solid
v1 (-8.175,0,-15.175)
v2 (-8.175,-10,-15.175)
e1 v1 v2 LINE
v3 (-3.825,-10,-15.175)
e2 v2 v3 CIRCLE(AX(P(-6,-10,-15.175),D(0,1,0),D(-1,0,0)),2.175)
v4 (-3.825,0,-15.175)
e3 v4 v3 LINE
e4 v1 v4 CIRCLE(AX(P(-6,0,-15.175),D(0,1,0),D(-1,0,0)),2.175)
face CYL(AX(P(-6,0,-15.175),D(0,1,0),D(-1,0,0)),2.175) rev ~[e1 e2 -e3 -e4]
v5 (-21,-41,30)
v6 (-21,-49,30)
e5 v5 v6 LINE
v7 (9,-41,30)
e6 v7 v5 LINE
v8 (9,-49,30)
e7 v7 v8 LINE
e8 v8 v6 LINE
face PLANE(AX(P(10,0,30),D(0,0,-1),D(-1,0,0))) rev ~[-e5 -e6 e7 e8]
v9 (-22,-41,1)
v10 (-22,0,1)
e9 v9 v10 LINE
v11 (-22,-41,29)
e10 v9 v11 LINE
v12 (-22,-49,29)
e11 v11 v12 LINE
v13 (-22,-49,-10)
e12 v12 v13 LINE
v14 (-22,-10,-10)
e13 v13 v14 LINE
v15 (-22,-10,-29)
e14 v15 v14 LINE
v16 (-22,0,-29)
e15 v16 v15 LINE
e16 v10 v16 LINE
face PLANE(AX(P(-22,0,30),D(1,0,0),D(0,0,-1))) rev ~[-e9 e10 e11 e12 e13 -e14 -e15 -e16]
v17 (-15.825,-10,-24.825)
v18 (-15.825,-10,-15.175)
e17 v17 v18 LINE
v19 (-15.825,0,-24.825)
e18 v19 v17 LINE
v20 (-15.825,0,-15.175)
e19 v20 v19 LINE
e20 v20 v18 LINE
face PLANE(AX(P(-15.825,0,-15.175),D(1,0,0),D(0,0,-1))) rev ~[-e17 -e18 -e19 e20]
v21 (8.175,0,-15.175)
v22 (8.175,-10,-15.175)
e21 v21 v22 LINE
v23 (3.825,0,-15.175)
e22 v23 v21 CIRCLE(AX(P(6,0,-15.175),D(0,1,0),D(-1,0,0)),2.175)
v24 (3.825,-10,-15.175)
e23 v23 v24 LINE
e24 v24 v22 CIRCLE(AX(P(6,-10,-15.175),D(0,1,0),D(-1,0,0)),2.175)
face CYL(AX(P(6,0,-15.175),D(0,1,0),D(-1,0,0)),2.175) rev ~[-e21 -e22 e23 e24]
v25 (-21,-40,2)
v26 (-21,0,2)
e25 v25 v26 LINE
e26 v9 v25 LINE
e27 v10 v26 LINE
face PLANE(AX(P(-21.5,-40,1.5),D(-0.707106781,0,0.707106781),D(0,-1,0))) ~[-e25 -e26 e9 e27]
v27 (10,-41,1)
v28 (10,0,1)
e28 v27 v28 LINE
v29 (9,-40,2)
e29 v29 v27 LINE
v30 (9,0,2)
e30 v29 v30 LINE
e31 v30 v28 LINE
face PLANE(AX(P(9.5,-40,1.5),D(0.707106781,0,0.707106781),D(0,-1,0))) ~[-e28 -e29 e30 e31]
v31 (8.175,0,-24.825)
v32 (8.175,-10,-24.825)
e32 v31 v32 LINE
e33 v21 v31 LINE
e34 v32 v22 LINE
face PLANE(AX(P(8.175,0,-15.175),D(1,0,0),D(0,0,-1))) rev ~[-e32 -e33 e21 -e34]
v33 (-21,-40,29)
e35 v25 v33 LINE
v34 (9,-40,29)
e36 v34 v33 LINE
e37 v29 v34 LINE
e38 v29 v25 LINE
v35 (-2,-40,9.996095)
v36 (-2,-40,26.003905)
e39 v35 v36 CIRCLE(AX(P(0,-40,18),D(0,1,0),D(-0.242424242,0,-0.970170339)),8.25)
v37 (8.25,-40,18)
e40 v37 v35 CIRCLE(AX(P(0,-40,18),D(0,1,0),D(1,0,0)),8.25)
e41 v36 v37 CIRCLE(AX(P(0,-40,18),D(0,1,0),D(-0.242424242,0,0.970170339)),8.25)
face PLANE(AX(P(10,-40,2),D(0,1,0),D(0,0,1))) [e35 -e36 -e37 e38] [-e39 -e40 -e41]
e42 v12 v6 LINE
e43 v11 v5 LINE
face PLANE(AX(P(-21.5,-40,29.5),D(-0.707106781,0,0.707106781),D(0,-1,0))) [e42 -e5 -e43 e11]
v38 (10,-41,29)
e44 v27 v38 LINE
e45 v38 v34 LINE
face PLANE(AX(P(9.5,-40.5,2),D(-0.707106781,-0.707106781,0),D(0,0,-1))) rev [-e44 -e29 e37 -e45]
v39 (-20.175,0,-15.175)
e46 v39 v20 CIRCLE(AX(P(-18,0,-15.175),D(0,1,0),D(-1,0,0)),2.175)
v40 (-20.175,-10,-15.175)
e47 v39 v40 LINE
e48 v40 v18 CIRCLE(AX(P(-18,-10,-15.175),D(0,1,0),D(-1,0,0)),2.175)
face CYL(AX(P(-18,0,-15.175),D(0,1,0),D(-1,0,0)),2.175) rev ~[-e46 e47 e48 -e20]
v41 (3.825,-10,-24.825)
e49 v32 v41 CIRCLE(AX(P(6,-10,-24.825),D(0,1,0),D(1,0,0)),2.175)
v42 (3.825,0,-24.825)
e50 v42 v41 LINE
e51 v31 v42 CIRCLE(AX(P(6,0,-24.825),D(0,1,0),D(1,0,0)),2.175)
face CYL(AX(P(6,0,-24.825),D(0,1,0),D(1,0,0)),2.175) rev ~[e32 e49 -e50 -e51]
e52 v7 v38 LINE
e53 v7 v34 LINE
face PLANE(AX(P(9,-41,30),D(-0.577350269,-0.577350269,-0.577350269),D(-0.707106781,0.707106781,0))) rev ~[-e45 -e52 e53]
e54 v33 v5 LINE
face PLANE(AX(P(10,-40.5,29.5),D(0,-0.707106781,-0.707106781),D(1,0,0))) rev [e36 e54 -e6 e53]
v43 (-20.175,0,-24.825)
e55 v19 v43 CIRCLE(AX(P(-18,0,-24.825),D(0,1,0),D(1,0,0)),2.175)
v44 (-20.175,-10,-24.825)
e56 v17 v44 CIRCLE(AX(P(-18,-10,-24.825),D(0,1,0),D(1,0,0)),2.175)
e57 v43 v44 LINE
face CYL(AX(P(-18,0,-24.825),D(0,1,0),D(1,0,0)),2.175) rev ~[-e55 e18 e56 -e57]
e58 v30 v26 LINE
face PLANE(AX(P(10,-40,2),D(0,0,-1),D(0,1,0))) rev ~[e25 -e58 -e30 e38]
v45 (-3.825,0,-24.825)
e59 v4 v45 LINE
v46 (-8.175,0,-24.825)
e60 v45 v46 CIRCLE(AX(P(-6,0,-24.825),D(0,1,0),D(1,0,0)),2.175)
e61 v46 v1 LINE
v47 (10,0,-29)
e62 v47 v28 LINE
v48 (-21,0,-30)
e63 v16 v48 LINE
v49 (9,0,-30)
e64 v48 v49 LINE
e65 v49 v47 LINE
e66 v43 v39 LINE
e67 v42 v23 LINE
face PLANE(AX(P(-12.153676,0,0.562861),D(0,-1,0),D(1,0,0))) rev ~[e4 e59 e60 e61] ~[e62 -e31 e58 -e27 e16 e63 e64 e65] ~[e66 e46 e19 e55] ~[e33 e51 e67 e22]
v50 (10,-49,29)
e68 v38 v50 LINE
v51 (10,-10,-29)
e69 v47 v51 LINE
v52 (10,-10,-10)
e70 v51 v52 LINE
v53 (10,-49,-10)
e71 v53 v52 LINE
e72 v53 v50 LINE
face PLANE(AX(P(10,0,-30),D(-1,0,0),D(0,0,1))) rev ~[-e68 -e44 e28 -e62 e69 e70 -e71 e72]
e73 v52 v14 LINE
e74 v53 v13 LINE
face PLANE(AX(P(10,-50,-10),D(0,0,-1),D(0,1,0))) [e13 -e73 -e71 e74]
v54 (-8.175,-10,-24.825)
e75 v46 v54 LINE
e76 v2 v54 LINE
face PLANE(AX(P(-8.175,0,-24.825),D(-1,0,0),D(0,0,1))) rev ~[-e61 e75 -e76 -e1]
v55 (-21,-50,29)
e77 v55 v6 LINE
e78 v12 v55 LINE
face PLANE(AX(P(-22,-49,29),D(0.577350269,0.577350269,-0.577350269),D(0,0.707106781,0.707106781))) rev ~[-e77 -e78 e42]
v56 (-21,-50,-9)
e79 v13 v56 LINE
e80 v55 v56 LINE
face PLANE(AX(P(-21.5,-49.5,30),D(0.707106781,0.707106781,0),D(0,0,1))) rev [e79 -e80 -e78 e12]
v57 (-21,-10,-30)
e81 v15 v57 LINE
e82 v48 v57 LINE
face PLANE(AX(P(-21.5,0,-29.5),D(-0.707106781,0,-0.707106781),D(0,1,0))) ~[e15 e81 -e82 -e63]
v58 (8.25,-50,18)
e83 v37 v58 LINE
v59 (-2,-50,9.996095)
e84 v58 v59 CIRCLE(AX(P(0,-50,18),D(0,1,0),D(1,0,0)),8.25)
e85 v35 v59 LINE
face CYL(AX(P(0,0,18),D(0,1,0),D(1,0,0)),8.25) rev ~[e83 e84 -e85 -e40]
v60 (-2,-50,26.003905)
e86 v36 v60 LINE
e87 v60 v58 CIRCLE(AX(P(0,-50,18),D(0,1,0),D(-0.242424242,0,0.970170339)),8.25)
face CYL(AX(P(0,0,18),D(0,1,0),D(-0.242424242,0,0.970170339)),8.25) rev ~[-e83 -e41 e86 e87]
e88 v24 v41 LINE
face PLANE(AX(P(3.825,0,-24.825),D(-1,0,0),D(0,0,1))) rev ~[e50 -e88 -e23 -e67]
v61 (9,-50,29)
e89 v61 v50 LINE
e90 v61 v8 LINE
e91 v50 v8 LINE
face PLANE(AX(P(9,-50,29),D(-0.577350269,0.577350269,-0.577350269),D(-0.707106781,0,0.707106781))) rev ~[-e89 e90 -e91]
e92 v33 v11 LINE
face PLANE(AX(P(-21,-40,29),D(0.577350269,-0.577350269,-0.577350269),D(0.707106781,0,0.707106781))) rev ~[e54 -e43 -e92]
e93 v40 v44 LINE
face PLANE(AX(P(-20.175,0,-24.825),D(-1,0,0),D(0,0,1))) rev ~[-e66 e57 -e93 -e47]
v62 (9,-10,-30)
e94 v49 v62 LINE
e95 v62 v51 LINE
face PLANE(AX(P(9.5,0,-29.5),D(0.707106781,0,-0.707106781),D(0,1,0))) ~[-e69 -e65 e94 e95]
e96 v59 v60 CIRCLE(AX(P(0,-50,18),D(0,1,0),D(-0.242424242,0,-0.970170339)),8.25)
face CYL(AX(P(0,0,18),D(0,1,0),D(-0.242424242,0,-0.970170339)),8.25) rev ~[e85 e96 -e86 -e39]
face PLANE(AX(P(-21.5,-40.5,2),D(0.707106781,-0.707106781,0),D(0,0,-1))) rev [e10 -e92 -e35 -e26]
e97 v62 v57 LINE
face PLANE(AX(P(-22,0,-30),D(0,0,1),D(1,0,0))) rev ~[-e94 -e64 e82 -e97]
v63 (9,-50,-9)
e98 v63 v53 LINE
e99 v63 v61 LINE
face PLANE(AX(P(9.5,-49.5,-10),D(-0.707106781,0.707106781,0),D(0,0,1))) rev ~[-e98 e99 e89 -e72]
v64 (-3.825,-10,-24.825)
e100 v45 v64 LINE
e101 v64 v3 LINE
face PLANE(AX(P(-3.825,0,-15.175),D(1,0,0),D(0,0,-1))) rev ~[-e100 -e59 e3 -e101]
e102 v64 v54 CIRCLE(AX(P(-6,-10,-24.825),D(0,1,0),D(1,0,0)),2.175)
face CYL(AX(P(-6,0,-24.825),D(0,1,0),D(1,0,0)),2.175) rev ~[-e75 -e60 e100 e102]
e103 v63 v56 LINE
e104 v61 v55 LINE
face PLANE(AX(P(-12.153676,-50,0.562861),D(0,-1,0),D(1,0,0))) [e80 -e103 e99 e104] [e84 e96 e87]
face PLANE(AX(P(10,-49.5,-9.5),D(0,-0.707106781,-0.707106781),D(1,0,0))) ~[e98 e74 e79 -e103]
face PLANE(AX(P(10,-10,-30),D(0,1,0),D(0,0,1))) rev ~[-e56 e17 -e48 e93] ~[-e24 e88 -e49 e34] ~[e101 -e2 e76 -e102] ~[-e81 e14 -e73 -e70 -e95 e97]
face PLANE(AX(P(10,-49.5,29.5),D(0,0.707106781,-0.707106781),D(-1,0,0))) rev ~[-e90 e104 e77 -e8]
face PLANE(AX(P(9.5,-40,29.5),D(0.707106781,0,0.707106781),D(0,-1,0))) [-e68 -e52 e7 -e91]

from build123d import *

# Parameters (mm, degrees)
F1_DEPTH = 50
F2_W     = 40
F2_H     = 28
F2_H_2   = 20
F3_DEPTH = 32.001
F4_SIZE  = 1


with BuildPart() as f1:
    # F0 (on Front) → F1 (new body)
    with BuildSketch(Plane.XZ):
        with BuildLine():
            Line((-22, 30), (-22, -30))
            Line((-22, -30), (-2, -30))
            Line((-2, -30), (-2, 9.9960947032))
            ThreePointArc((-2, 9.9960947032), (-8.25, 18), (-2, 26.0039052968))
            Line((-2, 26.0039052968), (-2, 30))
            Line((-2, 30), (-22, 30))
        make_face()
        with BuildLine():
            ThreePointArc((-15.825, -24.825), (-18, -27), (-20.175, -24.825))
            Line((-20.175, -24.825), (-20.175, -15.175))
            ThreePointArc((-20.175, -15.175), (-18, -13), (-15.825, -15.175))
            Line((-15.825, -15.175), (-15.825, -24.825))
        make_face(mode=Mode.SUBTRACT)
        with BuildLine():
            ThreePointArc((-3.825, -24.825), (-6, -27), (-8.175, -24.825))
            Line((-8.175, -24.825), (-8.175, -15.175))
            ThreePointArc((-8.175, -15.175), (-6, -13), (-3.825, -15.175))
            Line((-3.825, -15.175), (-3.825, -24.825))
        make_face(mode=Mode.SUBTRACT)
        with BuildLine():
            Line((-2, 9.9960947032), (-2, -30))
            Line((-2, -30), (10, -30))
            Line((10, -30), (10, 30))
            Line((10, 30), (-2, 30))
            Line((-2, 30), (-2, 26.0039052968))
            ThreePointArc((-2, 26.0039052968), (5.0775240029, 24.5024034018), (8.25, 18))
            ThreePointArc((8.25, 18), (5.0775240029, 11.4975965982), (-2, 9.9960947032))
        make_face()
        with BuildLine():
            Line((3.825, -24.825), (3.825, -15.175))
            ThreePointArc((3.825, -15.175), (6, -13), (8.175, -15.175))
            Line((8.175, -15.175), (8.175, -24.825))
            ThreePointArc((8.175, -24.825), (6, -27), (3.825, -24.825))
        make_face(mode=Mode.SUBTRACT)
    extrude(amount=F1_DEPTH)

    # F2 (on face) → F3 (cut, through all)
    with BuildSketch(Plane.YZ.offset(10)):
        with Locations((-20, 16)):
            Rectangle(F2_W, F2_H)
        with Locations((-30, -20)):
            Rectangle(F2_W, F2_H_2)
    extrude(amount=-F3_DEPTH, mode=Mode.SUBTRACT)

    # F4
    f4_edges = [f1.edges().sort_by_distance(p)[0] for p in [
        (10, -20, 2),
        (10, -40, 16),
        (10, -45, 30),
        (10, -50, 10),
        (10, -5, -30),
        (-6, -50, 30),
        (-22, -20, 2),
        (-22, -5, -30),
        (-22, -50, 10),
        (-22, -45, 30),
        (-22, -40, 16),
        (-6, -50, -10),
        (-6, -40, 30),
    ]]
    chamfer(f4_edges, length=F4_SIZE)


solid = f1.part
